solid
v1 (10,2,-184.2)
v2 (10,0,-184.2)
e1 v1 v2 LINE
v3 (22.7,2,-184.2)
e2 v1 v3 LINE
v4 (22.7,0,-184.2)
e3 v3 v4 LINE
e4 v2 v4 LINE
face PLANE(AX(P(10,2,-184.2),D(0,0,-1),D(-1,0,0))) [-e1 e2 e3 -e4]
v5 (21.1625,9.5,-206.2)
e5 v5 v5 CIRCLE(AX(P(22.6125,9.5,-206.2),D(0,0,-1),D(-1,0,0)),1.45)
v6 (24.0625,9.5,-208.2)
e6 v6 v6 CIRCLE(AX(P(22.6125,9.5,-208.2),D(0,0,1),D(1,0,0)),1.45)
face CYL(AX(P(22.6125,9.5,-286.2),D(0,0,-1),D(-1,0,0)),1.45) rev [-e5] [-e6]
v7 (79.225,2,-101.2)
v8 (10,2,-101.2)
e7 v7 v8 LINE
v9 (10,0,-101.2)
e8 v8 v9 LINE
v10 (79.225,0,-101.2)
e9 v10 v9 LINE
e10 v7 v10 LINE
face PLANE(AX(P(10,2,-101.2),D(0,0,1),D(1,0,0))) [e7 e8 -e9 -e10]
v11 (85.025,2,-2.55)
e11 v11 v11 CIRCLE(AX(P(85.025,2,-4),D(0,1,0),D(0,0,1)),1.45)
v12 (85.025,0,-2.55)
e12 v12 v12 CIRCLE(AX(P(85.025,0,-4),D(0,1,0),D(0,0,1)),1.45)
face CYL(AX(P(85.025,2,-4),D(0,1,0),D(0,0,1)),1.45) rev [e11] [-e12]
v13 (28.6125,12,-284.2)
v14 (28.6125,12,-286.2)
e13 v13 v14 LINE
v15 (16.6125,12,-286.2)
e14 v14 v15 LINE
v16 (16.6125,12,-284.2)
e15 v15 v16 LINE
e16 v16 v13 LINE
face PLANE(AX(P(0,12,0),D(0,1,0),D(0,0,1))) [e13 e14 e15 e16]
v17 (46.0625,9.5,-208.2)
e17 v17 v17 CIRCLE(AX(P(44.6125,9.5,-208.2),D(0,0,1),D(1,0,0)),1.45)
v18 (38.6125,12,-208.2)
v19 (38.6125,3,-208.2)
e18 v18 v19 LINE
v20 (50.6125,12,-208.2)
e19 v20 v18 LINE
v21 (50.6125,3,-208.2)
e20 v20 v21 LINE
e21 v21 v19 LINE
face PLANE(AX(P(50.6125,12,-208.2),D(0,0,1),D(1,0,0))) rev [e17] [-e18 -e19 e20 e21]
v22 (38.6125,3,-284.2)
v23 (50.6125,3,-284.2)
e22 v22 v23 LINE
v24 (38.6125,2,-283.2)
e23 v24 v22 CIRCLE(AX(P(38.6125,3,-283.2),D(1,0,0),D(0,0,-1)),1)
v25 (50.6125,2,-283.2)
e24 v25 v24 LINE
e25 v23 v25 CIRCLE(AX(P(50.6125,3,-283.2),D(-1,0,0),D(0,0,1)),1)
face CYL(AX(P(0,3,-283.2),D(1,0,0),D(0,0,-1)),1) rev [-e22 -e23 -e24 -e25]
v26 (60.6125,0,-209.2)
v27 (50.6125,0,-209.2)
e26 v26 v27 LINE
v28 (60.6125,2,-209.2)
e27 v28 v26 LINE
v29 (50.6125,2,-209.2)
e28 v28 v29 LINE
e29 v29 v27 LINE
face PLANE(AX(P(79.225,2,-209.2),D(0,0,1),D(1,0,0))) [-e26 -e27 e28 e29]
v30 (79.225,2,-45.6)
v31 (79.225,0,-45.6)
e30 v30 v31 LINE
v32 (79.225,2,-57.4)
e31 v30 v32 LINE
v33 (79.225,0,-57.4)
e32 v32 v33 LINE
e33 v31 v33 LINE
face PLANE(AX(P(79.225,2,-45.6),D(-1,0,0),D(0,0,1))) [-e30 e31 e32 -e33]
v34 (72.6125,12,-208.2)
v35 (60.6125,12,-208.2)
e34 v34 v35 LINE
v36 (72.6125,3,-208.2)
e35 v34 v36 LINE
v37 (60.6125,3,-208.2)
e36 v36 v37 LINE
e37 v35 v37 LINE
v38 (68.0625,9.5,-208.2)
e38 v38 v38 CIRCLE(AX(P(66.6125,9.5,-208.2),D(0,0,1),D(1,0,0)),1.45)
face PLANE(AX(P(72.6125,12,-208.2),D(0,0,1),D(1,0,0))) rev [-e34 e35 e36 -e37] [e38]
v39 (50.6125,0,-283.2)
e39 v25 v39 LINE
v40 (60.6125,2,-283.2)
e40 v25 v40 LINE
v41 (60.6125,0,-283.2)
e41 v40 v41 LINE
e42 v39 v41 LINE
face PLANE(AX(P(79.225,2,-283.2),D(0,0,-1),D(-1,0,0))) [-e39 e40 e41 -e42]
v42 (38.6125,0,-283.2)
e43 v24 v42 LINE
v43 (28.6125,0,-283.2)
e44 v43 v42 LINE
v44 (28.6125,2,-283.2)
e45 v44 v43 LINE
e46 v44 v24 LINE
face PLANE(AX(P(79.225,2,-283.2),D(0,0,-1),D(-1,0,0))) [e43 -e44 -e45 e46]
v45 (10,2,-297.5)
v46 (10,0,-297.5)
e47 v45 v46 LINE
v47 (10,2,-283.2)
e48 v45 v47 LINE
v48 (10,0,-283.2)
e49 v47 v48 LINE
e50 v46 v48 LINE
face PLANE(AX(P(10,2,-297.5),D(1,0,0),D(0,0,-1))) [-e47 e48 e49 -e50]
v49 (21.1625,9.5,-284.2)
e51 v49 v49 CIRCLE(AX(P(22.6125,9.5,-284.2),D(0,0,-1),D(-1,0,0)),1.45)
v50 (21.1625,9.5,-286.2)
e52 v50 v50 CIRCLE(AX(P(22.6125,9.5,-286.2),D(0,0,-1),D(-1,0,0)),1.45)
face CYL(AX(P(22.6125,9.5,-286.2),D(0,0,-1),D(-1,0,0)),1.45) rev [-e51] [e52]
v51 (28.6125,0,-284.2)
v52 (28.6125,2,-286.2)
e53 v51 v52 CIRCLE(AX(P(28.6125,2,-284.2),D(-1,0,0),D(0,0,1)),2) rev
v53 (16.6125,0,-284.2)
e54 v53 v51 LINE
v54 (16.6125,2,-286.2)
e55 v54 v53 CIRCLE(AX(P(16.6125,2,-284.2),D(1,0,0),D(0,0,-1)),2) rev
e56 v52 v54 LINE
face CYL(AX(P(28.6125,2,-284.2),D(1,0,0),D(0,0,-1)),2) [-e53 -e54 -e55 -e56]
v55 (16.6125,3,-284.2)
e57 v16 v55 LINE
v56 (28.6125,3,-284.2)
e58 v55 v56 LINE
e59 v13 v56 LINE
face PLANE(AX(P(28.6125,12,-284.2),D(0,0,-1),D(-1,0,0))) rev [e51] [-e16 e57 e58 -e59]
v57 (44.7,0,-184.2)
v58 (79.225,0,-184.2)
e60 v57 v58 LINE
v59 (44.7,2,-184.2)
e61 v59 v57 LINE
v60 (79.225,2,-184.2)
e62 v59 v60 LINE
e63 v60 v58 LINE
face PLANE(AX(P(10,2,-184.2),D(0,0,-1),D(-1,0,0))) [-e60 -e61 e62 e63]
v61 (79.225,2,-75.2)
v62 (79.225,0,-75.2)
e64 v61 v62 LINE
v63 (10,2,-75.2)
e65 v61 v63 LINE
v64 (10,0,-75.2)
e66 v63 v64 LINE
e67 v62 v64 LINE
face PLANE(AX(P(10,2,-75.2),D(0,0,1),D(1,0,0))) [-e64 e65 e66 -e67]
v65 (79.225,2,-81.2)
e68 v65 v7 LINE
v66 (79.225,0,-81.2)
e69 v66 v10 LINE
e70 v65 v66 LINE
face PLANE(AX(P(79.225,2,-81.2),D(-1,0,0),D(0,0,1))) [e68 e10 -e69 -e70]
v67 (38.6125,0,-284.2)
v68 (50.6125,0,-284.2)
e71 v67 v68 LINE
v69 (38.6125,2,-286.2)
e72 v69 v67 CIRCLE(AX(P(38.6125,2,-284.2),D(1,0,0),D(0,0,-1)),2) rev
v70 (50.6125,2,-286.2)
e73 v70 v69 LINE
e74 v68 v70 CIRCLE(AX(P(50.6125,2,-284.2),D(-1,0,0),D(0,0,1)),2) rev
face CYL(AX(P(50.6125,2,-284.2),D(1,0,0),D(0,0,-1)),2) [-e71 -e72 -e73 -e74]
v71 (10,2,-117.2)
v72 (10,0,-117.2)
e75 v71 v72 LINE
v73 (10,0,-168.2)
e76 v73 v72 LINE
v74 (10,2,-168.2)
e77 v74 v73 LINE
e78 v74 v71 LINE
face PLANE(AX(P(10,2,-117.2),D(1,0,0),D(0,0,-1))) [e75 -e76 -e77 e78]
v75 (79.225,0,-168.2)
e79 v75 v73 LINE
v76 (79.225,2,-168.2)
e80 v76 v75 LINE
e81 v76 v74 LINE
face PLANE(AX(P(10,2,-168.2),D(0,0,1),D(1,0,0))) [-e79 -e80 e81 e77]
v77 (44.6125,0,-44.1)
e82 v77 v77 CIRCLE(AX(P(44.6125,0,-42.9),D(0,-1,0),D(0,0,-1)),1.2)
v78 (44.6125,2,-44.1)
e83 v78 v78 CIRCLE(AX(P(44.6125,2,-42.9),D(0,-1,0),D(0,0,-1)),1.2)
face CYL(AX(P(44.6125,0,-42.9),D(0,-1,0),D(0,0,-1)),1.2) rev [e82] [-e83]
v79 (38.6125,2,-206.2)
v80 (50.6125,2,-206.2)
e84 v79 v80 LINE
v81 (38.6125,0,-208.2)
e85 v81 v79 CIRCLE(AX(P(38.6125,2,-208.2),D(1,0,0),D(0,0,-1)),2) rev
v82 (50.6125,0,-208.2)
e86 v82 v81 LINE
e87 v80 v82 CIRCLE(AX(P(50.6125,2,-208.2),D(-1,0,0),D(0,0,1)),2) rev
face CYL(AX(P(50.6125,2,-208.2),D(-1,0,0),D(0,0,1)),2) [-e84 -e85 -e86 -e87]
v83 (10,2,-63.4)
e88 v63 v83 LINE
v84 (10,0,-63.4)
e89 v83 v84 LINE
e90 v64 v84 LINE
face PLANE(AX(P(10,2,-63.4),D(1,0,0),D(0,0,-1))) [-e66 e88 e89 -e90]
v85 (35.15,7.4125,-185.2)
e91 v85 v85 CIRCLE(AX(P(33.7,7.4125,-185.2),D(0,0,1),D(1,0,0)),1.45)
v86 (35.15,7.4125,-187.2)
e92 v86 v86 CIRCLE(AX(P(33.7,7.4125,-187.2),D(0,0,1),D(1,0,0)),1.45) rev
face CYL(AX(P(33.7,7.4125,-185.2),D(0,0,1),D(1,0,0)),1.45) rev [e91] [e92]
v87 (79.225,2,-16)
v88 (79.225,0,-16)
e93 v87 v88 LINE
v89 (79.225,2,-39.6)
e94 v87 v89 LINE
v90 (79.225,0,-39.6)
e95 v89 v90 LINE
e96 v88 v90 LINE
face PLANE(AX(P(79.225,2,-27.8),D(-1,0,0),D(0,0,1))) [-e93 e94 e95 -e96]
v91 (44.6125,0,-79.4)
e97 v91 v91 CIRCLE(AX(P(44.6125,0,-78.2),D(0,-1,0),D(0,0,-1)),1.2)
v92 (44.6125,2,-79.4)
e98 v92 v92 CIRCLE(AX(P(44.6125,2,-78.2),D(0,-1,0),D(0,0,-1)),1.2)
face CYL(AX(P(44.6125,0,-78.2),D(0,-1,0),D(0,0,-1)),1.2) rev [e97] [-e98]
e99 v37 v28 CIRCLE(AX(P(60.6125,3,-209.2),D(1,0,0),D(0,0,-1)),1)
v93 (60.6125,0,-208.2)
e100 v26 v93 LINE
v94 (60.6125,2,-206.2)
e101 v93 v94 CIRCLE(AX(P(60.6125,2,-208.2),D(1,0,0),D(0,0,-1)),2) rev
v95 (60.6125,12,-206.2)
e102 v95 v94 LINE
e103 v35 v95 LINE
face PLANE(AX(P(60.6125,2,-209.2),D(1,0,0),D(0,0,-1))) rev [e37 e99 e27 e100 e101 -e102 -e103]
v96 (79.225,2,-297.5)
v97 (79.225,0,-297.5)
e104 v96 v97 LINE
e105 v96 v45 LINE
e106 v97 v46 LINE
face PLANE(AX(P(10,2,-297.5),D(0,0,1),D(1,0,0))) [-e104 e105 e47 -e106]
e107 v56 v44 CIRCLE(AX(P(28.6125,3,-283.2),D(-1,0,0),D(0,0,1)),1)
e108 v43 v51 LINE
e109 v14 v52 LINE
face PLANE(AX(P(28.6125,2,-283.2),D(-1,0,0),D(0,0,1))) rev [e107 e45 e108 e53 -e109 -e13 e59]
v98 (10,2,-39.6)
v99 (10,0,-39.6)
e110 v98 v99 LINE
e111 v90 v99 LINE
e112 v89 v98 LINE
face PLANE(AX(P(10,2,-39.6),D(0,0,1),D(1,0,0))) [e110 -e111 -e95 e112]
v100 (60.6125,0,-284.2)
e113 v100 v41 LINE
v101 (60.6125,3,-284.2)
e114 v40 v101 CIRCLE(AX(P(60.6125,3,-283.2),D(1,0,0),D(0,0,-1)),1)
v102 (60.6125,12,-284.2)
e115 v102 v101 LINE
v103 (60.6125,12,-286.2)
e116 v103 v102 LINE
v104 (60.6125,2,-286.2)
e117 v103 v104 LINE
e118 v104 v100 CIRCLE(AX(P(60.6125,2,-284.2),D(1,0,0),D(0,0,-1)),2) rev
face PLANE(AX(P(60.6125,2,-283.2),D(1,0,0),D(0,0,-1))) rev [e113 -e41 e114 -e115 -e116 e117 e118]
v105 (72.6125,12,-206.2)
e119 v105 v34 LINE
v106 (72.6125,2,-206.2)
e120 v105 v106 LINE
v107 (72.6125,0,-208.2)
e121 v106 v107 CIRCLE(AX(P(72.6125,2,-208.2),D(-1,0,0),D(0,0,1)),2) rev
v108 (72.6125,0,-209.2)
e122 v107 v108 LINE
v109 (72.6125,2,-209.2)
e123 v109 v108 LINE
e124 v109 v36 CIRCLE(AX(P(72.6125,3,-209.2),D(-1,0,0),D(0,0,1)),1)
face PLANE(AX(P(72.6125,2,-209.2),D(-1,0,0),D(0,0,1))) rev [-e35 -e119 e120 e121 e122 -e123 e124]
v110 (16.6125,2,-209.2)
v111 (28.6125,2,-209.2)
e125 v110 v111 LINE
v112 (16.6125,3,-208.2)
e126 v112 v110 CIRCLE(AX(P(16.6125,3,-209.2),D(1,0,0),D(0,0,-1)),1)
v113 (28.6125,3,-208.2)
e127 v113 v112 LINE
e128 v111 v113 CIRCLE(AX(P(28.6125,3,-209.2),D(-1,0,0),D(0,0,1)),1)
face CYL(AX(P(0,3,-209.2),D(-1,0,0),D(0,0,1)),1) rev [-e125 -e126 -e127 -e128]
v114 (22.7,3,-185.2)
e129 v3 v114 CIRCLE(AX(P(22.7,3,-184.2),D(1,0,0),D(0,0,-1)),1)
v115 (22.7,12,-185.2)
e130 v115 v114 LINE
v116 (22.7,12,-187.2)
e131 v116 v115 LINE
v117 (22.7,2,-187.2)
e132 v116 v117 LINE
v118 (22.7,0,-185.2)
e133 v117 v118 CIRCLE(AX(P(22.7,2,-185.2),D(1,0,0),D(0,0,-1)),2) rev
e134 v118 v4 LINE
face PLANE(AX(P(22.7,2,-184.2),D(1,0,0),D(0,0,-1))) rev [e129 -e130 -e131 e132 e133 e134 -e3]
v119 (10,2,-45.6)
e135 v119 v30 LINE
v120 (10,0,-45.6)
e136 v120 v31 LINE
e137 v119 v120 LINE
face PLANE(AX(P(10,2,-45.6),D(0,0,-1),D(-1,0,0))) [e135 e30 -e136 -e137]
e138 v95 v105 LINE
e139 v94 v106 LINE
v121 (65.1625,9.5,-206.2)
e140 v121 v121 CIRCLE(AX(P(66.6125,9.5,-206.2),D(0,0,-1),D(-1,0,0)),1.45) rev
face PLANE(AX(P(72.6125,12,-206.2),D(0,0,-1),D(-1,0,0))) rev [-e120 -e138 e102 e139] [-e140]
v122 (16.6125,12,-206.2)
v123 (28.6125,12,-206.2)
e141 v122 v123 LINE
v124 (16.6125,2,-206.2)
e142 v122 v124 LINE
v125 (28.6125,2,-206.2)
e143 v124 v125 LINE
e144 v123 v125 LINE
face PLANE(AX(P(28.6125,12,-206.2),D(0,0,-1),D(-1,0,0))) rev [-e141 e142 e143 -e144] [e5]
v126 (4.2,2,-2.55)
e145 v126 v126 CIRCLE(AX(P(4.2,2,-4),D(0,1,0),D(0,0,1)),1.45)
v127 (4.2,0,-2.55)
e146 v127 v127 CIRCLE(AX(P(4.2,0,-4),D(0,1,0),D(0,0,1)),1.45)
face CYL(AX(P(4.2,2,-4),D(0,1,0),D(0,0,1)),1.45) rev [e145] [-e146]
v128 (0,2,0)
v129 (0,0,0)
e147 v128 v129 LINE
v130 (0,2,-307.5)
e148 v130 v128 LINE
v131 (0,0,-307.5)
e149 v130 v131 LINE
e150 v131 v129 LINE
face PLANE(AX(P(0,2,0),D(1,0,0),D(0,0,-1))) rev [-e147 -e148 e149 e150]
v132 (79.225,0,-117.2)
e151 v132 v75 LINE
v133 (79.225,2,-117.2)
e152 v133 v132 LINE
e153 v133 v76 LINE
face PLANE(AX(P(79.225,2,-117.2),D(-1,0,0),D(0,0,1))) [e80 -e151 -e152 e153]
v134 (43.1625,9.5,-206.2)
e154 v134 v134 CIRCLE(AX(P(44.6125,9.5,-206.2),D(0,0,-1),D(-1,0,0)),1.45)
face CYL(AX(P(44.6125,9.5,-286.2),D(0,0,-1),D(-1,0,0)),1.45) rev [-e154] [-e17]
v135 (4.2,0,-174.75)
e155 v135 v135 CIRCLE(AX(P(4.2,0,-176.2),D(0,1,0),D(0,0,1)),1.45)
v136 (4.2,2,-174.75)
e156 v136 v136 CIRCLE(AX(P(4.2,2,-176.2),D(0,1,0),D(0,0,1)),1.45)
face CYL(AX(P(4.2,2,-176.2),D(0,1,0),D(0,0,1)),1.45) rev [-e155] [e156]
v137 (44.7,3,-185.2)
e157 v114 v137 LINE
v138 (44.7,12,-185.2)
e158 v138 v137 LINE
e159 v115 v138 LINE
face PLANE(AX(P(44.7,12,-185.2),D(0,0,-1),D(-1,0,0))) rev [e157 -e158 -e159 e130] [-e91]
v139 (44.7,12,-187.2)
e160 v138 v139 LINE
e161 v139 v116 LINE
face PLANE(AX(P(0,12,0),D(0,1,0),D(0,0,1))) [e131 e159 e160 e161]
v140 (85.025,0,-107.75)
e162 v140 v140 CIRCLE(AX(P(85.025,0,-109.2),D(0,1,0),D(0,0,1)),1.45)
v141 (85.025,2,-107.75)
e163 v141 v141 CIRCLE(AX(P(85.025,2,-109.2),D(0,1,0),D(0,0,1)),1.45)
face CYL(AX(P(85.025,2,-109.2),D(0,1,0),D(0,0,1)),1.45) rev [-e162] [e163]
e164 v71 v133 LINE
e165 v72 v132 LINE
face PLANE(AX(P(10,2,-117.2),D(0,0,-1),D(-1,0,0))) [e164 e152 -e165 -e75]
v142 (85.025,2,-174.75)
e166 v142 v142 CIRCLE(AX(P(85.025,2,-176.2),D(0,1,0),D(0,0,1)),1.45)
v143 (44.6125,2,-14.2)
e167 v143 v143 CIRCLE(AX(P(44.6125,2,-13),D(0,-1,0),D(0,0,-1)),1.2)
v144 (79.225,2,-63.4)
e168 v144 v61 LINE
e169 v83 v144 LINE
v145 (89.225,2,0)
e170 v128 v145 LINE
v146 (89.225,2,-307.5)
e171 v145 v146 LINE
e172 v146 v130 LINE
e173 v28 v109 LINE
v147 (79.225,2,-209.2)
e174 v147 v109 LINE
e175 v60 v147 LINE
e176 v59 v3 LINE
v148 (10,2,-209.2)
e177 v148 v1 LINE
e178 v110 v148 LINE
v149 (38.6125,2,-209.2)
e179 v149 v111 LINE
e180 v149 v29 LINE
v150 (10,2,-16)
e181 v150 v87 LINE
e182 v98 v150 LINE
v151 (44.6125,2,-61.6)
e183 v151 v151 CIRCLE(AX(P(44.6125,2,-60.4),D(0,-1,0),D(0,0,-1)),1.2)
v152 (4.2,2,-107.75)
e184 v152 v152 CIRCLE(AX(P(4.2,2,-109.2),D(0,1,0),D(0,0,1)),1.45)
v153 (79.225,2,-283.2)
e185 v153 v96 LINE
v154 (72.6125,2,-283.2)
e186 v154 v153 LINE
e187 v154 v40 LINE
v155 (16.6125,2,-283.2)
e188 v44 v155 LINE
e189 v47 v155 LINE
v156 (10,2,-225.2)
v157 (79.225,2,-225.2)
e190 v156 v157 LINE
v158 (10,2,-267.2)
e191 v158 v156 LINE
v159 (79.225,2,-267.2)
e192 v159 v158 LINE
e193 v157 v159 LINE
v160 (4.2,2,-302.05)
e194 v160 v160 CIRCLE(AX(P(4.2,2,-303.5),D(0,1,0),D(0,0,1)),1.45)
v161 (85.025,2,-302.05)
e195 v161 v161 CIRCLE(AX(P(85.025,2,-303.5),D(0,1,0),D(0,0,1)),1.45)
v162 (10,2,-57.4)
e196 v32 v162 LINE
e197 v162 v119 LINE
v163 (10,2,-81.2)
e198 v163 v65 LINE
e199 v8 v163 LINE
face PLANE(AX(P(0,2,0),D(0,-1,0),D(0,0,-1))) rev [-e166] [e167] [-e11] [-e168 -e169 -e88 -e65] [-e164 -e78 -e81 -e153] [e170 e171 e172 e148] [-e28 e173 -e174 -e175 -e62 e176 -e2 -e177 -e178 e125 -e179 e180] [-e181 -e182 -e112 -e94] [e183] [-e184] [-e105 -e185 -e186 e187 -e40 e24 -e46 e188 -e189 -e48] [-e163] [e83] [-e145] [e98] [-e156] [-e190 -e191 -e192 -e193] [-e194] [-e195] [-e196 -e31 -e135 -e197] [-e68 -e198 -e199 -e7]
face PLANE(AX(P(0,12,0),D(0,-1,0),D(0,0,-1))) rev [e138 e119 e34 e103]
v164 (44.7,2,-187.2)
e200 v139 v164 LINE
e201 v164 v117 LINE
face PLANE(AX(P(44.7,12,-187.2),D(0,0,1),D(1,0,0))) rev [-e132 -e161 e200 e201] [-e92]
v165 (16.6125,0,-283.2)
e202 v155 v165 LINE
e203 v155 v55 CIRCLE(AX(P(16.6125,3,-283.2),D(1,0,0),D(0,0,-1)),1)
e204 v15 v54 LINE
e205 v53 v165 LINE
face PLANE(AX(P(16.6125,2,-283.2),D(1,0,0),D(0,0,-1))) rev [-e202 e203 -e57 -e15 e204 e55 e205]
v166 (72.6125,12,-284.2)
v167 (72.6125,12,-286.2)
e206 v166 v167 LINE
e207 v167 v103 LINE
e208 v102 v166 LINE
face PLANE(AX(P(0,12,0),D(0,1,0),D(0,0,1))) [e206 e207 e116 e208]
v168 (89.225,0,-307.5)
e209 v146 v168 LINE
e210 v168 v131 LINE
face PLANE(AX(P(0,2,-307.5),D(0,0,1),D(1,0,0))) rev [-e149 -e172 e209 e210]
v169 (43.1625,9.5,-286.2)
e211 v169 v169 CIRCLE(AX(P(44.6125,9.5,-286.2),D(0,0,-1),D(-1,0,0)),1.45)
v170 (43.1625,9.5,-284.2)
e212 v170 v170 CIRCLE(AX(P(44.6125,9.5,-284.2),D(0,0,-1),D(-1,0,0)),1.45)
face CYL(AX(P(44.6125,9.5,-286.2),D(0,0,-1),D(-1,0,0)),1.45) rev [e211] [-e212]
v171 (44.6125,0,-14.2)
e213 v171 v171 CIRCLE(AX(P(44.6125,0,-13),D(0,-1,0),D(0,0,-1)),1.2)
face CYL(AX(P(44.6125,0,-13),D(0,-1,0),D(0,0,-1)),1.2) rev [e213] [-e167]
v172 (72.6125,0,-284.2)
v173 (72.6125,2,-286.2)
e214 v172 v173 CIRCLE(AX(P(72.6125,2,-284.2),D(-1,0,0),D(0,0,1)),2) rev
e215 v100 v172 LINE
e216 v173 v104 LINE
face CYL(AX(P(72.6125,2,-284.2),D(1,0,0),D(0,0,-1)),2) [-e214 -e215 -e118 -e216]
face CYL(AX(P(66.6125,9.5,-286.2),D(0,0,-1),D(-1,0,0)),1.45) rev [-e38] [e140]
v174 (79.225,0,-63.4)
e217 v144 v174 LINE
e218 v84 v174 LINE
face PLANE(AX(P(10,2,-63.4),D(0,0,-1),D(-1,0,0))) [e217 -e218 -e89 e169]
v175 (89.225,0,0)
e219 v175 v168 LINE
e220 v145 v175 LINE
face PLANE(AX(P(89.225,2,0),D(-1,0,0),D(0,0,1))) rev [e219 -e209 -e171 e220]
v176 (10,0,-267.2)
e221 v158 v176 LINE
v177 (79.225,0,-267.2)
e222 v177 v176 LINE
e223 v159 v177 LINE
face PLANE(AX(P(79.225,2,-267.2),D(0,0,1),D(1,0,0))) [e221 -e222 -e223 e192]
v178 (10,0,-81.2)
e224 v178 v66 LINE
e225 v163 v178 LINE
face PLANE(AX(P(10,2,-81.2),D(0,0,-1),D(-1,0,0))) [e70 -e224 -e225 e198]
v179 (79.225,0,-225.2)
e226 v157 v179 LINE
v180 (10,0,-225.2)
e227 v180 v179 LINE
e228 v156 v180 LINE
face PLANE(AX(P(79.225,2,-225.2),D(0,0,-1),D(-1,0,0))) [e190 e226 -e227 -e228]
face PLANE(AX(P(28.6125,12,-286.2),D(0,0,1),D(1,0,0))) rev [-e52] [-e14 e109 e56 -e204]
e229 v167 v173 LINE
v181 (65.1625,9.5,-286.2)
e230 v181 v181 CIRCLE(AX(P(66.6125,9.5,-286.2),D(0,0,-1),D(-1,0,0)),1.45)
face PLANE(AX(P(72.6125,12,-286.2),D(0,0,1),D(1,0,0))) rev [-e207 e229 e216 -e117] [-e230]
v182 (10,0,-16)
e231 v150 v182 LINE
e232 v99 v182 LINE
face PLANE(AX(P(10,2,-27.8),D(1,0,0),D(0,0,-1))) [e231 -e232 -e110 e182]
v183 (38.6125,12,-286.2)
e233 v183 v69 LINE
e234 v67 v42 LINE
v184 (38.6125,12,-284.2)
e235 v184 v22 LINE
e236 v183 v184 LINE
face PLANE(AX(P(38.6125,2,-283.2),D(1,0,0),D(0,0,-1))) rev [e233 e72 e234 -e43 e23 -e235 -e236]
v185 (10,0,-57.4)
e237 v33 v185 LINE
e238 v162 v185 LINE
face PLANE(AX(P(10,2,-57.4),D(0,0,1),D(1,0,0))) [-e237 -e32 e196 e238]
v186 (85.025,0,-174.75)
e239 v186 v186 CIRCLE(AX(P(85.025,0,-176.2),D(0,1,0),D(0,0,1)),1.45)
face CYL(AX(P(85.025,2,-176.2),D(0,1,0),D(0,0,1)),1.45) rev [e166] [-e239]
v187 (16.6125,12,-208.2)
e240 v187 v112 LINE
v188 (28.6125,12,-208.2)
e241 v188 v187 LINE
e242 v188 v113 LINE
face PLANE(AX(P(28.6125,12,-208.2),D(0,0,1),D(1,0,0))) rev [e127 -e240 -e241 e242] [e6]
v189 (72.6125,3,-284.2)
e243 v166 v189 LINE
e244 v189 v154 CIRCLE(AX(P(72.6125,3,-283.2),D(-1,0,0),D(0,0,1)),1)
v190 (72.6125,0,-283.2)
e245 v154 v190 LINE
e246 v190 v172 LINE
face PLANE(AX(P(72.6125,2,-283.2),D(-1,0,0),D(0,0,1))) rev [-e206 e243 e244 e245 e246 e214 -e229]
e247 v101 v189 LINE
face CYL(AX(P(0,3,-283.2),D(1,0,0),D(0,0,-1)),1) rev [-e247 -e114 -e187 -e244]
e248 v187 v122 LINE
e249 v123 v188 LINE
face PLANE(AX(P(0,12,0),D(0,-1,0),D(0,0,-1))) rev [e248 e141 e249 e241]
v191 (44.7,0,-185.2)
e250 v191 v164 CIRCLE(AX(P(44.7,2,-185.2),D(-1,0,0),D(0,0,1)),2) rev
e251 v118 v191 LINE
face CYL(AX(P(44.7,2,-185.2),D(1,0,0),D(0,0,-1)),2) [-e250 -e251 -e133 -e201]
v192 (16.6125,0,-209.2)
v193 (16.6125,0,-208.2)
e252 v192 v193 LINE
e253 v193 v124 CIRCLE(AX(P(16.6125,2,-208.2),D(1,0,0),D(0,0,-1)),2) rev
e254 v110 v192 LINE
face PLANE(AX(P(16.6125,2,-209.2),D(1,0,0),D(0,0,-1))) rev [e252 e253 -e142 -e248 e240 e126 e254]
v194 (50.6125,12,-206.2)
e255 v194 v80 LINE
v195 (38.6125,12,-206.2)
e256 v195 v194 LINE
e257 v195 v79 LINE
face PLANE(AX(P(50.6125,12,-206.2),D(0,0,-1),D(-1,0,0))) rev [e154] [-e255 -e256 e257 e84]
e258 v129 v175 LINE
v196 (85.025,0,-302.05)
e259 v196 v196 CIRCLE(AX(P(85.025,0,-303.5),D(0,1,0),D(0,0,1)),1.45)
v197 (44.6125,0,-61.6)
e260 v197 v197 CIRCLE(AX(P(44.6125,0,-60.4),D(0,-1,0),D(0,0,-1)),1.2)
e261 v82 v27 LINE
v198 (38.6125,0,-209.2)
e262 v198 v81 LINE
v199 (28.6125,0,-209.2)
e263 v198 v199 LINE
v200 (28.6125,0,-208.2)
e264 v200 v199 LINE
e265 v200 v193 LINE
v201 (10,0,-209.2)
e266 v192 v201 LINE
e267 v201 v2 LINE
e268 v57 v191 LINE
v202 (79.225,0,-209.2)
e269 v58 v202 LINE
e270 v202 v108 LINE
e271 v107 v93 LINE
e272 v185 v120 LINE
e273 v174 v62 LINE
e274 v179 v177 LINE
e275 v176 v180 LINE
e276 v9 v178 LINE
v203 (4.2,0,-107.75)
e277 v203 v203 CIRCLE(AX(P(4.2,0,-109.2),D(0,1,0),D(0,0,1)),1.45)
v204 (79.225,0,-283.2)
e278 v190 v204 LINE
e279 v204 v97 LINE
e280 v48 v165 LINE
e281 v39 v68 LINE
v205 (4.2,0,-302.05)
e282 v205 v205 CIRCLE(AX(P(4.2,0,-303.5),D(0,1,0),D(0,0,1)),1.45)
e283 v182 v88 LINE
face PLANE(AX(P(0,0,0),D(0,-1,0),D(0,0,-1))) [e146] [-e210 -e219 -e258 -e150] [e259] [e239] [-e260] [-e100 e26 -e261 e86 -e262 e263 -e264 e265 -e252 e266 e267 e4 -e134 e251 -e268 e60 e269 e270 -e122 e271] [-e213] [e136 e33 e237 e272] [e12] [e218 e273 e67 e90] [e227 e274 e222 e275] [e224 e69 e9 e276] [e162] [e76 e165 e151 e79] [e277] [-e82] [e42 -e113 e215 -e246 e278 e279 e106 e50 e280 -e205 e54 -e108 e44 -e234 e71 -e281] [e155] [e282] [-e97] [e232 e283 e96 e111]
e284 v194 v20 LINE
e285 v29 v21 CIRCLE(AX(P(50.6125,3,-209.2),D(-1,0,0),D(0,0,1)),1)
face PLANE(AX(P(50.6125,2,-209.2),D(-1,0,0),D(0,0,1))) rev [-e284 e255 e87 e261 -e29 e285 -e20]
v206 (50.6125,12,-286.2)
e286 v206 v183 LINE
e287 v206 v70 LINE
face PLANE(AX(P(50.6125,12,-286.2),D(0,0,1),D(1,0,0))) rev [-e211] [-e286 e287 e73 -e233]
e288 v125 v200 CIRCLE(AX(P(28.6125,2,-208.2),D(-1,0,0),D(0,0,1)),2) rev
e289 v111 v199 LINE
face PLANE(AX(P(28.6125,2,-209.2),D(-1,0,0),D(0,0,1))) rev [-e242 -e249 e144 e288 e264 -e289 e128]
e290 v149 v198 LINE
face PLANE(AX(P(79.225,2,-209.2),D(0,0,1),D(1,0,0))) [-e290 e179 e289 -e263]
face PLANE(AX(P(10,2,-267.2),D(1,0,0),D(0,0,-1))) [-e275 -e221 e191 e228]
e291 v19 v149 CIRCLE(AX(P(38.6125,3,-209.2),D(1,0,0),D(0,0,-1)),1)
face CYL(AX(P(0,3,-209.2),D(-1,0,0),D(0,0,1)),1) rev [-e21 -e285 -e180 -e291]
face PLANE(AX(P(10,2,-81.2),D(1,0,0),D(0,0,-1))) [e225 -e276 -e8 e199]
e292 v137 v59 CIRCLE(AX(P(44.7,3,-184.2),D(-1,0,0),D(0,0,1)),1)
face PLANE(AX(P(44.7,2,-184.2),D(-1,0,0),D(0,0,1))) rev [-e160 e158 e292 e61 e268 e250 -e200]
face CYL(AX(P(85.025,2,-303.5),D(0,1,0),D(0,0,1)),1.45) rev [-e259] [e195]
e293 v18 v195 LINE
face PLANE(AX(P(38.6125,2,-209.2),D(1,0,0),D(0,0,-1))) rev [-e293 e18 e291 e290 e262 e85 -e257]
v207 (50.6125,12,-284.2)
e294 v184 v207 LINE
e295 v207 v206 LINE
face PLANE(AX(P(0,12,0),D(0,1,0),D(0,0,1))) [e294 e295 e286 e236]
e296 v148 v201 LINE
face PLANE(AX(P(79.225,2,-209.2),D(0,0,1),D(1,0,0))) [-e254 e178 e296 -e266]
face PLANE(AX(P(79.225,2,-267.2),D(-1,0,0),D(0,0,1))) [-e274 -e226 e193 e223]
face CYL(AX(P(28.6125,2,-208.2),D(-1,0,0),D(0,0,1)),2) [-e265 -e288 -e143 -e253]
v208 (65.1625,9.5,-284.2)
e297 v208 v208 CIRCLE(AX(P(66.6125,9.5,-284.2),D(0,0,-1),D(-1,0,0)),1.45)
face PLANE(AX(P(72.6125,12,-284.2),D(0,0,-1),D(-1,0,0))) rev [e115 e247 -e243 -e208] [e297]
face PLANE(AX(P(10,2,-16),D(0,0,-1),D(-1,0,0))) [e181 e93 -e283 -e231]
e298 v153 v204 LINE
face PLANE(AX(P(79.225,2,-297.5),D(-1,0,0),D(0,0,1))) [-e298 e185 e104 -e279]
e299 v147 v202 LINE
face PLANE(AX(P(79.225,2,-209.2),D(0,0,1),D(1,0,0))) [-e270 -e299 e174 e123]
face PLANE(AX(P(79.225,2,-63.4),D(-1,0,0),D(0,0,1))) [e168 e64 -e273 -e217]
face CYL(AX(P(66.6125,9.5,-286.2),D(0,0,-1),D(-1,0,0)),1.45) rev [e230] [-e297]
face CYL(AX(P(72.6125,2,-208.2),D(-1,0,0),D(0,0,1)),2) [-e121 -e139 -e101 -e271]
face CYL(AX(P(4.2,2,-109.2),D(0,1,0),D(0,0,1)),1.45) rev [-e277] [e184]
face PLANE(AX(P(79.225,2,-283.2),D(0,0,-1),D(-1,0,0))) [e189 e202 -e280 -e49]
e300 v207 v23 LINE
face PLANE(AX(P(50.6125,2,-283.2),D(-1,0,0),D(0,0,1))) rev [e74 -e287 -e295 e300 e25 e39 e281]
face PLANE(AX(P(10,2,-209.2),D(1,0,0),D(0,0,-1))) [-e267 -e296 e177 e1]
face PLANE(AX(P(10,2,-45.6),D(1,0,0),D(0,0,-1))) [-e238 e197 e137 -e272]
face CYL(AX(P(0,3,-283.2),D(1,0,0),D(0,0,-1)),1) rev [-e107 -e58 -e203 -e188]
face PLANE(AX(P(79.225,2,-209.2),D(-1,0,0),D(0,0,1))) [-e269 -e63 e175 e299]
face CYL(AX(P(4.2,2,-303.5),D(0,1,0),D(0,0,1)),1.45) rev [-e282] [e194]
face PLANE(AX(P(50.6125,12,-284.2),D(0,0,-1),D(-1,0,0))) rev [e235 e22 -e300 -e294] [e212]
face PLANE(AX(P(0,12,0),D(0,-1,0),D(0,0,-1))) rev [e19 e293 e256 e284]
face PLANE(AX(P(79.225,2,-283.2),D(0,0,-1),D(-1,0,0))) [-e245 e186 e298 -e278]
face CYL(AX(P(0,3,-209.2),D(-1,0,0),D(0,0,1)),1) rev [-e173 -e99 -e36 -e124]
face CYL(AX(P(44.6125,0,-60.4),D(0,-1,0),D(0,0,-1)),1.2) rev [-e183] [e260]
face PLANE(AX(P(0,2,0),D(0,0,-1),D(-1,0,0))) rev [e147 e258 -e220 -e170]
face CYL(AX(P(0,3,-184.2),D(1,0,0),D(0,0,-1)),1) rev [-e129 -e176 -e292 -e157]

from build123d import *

# Parameters (mm, degrees)
SKETCH1_W                      = 89.225
SKETCH1_H                      = 307.5
SKETCH1_W_2                    = 69.225
SKETCH1_H_2                    = 42
SKETCH1_H_3                    = 20
SKETCH1_H_4                    = 51
SKETCH1_H_5                    = 14.3
SKETCH1_H_6                    = 25
BOSS_EXTRUDE1_DEPTH            = 2
SKETCH20_W                     = 22
SKETCH20_H                     = 1
BOSS_EXTRUDE7_DEPTH            = 2
SKETCH21_W                     = 22
SKETCH21_H                     = 2
BOSS_EXTRUDE8_DEPTH            = 12
FILLET7_R                      = 2
FILLET8_R                      = 1
M2_5_CLEARANCE_HOLE3_D         = 2.9
SKETCH28_W                     = 12
SKETCH28_H                     = 1
BOSS_EXTRUDE11_DEPTH           = 2
SKETCH29_W                     = 12
SKETCH29_H                     = 2
BOSS_EXTRUDE12_DEPTH           = 12
FILLET11_R                     = 2
FILLET12_R                     = 1
M2_5_START                     = -286.2
M2_5_CLEARANCE_HOLE5_OUTLINE_R = 1.45
M2_5_CLEARANCE_HOLE5_DEPTH     = 80
M2_5_CLEARANCE_HOLE6_D         = 2.9
M2_CLEARANCE_HOLE1_D           = 2.4
M2_CLEARANCE_HOLE3_D           = 2.4


# Read off the part's stored shape, not the designer's step: M2.5 Clearance Hole5
with BuildPart() as part:
    # Sketch1 → Boss-Extrude1 (new body)
    with BuildSketch(Plane(origin=(0, 0, 0), x_dir=(1, 0, 0), z_dir=(0, 1, 0))):
        with Locations((44.6125, 153.75)):
            Rectangle(SKETCH1_W, SKETCH1_H)
        with Locations((44.6125, 246.2)):
            Rectangle(SKETCH1_W_2, SKETCH1_H_2, mode=Mode.SUBTRACT)
        Polygon((10, 16), (79.225, 16), (79.225, 21.8), (79.225, 27.8), (79.225, 39.6), (56.6125, 39.6), (32.6125, 39.6), (10, 39.6), (10, 27.8), align=None, mode=Mode.SUBTRACT)
        Polygon((10, 45.6), (79.225, 45.6), (79.225, 57.4), (56.6125, 57.4), (32.6125, 57.4), (10, 57.4), align=None, mode=Mode.SUBTRACT)
        Polygon((10, 63.4), (79.225, 63.4), (79.225, 75.2), (56.6125, 75.2), (32.6125, 75.2), (10, 75.2), align=None, mode=Mode.SUBTRACT)
        with Locations((44.6125, 91.2)):
            Rectangle(SKETCH1_W_2, SKETCH1_H_3, mode=Mode.SUBTRACT)
        with Locations((44.6125, 142.7)):
            Rectangle(SKETCH1_W_2, SKETCH1_H_4, mode=Mode.SUBTRACT)
        with Locations((44.6125, 290.35)):
            Rectangle(SKETCH1_W_2, SKETCH1_H_5, mode=Mode.SUBTRACT)
        with Locations((44.6125, 196.7)):
            Rectangle(SKETCH1_W_2, SKETCH1_H_6, mode=Mode.SUBTRACT)
    extrude(amount=BOSS_EXTRUDE1_DEPTH)

    # Sketch20 → Boss-Extrude7 (add)
    with BuildSketch(Plane(origin=(0, 0, 0), x_dir=(1, 0, 0), z_dir=(0, 1, 0))):
        with Locations((33.7, 184.7)):
            Rectangle(SKETCH20_W, SKETCH20_H)
    extrude(amount=BOSS_EXTRUDE7_DEPTH)

    # Sketch21 → Boss-Extrude8 (add)
    with BuildSketch(Plane(origin=(0, 0, 0), x_dir=(1, 0, 0), z_dir=(0, 1, 0))):
        with Locations((33.7, 186.2)):
            Rectangle(SKETCH21_W, SKETCH21_H)
    extrude(amount=BOSS_EXTRUDE8_DEPTH)

    # Fillet7
    fillet7_edges = [part.edges().sort_by_distance(p)[0] for p in [
        (33.7, 0, -187.2),
    ]]
    fillet(fillet7_edges, radius=FILLET7_R)

    # Fillet8
    fillet8_edges = [part.edges().sort_by_distance(p)[0] for p in [
        (33.7, 2, -185.2),
    ]]
    fillet(fillet8_edges, radius=FILLET8_R)

    # M2.5 Clearance Hole3 (through all)
    with Locations(Plane.XY.offset(-185.2)):
        with Locations((33.7, 7.4125)):
            Hole(M2_5_CLEARANCE_HOLE3_D / 2)

    # Sketch28 → Boss-Extrude11 (add)
    with BuildSketch(Plane(origin=(0, 0, 0), x_dir=(1, 0, 0), z_dir=(0, 1, 0))):
        with Locations((66.6125, 208.7)):
            Rectangle(SKETCH28_W, SKETCH28_H)
        with Locations((44.6125, 208.7)):
            Rectangle(SKETCH28_W, SKETCH28_H)
        with Locations((22.6125, 208.7)):
            Rectangle(SKETCH28_W, SKETCH28_H)
        with Locations((66.6125, 283.7)):
            Rectangle(SKETCH28_W, SKETCH28_H)
        with Locations((44.6125, 283.7)):
            Rectangle(SKETCH28_W, SKETCH28_H)
        with Locations((22.6125, 283.7)):
            Rectangle(SKETCH28_W, SKETCH28_H)
    extrude(amount=BOSS_EXTRUDE11_DEPTH)

    # Sketch29 → Boss-Extrude12 (add)
    with BuildSketch(Plane(origin=(0, 0, 0), x_dir=(1, 0, 0), z_dir=(0, 1, 0))):
        with Locations((66.6125, 207.2)):
            Rectangle(SKETCH29_W, SKETCH29_H)
        with Locations((44.6125, 207.2)):
            Rectangle(SKETCH29_W, SKETCH29_H)
        with Locations((22.6125, 207.2)):
            Rectangle(SKETCH29_W, SKETCH29_H)
        with Locations((66.6125, 285.2)):
            Rectangle(SKETCH29_W, SKETCH29_H)
        with Locations((44.6125, 285.2)):
            Rectangle(SKETCH29_W, SKETCH29_H)
        with Locations((22.6125, 285.2)):
            Rectangle(SKETCH29_W, SKETCH29_H)
    extrude(amount=BOSS_EXTRUDE12_DEPTH)

    # Fillet11
    fillet11_edges = [part.edges().sort_by_distance(p)[0] for p in [
        (66.6125, 0, -206.2),
        (44.6125, 0, -206.2),
        (22.6125, 0, -206.2),
        (66.6125, 0, -286.2),
        (44.6125, 0, -286.2),
        (22.6125, 0, -286.2),
    ]]
    fillet(fillet11_edges, radius=FILLET11_R)

    # Fillet12
    fillet12_edges = [part.edges().sort_by_distance(p)[0] for p in [
        (22.6125, 2, -284.2),
        (44.6125, 2, -284.2),
        (66.6125, 2, -284.2),
        (66.6125, 2, -208.2),
        (44.6125, 2, -208.2),
        (22.6125, 2, -208.2),
    ]]
    fillet(fillet12_edges, radius=FILLET12_R)

    # M2.5 Clearance Hole5 outline → M2.5 Clearance Hole5 (cut)
    with BuildSketch(Plane.XY.offset(M2_5_START)):
        with Locations((22.6125, 9.5)):
            Circle(M2_5_CLEARANCE_HOLE5_OUTLINE_R)
        with Locations((44.6125, 9.5)):
            Circle(M2_5_CLEARANCE_HOLE5_OUTLINE_R)
        with Locations((66.6125, 9.5)):
            Circle(M2_5_CLEARANCE_HOLE5_OUTLINE_R)
    extrude(amount=M2_5_CLEARANCE_HOLE5_DEPTH, mode=Mode.SUBTRACT)

    # M2.5 Clearance Hole6 (through all)
    with Locations(Plane(origin=(0, 2, 0), x_dir=(1, 0, 0), z_dir=(0, 1, 0))):
        with Locations((85.025, 4), (4.2, 4), (4.2, 109.2), (4.2, 176.2), (4.2, 303.5), (85.025, 303.5), (85.025, 176.2), (85.025, 109.2)):
            Hole(M2_5_CLEARANCE_HOLE6_D / 2)

    # M2 Clearance Hole1 (through all)
    with Locations(Plane(origin=(0, 0, 0), x_dir=(-1, 0, 0), z_dir=(0, -1, 0))):
        with Locations((-44.6125, 24.8), (-44.6125, 42.9), (-44.6125, 60.4), (-44.6125, 78.2)):
            Hole(M2_CLEARANCE_HOLE1_D / 2)

    # M2 Clearance Hole3 (through all)
    with Locations(Plane(origin=(0, 0, 0), x_dir=(-1, 0, 0), z_dir=(0, -1, 0))):
        with Locations((-44.6125, 13)):
            Hole(M2_CLEARANCE_HOLE3_D / 2)


solid = part.part
